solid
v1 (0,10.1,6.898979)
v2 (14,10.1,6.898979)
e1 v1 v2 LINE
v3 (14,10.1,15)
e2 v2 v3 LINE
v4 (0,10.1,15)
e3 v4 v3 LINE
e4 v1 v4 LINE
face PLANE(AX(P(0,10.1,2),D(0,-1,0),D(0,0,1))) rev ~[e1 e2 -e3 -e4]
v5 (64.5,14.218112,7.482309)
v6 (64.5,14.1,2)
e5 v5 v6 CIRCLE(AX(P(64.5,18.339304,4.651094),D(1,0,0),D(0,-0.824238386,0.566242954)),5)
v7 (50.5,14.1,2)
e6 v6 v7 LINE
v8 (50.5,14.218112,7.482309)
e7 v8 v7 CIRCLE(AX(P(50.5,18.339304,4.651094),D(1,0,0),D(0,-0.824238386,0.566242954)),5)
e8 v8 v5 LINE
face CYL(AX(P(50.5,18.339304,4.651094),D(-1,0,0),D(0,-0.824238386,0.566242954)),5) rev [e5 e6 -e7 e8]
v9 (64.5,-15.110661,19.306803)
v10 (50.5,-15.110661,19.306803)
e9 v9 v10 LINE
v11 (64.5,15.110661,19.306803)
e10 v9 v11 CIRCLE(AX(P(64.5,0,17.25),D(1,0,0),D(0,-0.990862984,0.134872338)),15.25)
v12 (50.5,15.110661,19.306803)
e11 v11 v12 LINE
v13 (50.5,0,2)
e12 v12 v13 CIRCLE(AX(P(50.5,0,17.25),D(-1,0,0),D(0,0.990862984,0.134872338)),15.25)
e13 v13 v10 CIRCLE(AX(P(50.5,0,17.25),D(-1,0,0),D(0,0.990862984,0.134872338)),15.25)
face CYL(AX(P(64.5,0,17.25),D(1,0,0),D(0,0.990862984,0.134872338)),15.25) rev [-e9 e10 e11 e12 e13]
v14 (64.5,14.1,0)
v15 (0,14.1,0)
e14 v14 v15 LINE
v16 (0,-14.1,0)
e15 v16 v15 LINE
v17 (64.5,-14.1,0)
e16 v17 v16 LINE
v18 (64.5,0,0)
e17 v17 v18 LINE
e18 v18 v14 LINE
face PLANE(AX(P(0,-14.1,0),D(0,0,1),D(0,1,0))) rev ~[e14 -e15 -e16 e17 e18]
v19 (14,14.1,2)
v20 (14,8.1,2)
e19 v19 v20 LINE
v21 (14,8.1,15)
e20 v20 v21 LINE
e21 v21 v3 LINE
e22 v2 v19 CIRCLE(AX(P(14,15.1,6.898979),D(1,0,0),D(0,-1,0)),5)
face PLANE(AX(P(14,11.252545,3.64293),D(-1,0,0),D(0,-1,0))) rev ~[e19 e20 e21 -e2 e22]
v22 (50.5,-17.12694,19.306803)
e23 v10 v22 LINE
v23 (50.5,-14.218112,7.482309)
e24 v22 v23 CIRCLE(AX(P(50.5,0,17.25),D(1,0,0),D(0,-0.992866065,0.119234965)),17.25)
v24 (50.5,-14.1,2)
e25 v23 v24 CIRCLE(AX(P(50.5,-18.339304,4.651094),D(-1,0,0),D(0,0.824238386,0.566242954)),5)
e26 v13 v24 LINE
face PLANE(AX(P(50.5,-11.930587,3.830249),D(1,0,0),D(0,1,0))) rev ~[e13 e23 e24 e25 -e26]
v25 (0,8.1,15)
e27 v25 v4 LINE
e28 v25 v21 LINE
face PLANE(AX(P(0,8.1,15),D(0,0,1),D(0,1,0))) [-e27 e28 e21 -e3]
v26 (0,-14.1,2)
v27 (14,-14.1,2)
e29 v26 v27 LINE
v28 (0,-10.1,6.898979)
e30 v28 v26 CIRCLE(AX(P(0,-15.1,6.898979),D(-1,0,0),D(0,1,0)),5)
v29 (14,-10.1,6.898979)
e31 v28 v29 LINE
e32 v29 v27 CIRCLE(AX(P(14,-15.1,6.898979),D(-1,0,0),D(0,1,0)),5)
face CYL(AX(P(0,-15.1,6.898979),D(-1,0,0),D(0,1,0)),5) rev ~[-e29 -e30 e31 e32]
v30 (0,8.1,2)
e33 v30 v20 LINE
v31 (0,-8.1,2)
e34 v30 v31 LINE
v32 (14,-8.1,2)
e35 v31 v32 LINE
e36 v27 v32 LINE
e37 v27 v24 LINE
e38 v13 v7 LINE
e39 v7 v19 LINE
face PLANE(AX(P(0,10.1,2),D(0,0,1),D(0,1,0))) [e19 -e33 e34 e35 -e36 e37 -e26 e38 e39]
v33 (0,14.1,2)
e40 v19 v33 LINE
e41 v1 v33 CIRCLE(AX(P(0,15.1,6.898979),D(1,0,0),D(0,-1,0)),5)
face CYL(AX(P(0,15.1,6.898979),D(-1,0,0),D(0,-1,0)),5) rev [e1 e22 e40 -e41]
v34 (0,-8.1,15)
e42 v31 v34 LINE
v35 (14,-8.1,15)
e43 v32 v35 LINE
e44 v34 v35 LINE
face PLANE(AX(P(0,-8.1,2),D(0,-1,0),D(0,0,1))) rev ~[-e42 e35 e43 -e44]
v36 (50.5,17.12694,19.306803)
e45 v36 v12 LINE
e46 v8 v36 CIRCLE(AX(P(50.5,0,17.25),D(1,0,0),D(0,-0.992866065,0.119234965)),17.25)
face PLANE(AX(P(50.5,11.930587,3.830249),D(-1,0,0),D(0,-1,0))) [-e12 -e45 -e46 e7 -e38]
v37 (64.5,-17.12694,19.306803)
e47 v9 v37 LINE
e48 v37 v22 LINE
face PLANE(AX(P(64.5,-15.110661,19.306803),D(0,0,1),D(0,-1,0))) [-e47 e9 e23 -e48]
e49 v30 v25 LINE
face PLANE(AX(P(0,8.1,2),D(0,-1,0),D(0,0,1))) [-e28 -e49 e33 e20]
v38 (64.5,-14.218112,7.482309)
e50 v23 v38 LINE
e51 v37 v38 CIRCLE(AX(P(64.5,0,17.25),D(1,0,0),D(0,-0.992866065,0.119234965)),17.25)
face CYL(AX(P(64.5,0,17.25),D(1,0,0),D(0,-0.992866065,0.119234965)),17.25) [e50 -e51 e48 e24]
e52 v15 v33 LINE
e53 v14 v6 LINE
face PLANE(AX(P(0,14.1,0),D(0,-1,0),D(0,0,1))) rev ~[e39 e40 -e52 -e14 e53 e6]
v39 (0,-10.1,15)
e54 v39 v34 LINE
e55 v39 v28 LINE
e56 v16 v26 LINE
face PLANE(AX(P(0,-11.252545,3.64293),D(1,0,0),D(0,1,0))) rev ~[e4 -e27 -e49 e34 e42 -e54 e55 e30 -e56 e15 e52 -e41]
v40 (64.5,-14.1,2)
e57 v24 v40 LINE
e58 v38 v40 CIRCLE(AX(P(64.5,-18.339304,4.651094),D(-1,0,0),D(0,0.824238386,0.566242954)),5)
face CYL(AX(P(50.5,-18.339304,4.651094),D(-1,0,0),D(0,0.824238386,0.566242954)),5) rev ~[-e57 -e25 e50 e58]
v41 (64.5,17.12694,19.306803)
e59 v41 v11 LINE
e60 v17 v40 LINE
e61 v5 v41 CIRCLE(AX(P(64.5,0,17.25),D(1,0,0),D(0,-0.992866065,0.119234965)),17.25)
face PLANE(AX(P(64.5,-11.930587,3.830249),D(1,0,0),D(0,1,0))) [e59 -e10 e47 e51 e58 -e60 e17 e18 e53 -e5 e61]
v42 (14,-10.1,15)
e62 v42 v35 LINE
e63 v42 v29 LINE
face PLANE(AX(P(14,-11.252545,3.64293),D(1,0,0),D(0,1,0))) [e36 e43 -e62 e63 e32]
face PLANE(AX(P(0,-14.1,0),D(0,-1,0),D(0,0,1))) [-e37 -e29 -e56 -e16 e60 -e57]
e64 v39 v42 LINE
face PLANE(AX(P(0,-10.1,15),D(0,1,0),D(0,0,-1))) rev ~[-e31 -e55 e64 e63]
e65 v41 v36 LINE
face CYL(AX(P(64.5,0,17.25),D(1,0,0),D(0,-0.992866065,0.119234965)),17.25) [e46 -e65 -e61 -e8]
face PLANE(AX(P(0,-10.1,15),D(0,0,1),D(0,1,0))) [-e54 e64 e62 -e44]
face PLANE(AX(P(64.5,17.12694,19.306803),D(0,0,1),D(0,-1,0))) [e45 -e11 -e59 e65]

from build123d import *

# Parameters (mm, degrees)
F0_W        = 2
F0_H        = 13
F0_W_2      = 4
F0_H_2      = 2
F1_DEPTH    = 14
F2_DEPTH    = 64.5
F4_DEPTH    = 14
F5_T1_DEPTH = 14
F5_T3_DEPTH = 14


# Not quite as in the source:
# - a fillet or chamfer that OpenCascade refuses, or shapes differently, is made with other operations: its cross-section is extruded or revolved along the edge and cut away or added


with BuildPart() as f1:
    # F0 (on Right) → F1 (new body)
    with BuildSketch(Plane.YZ):
        Polygon((-10.1, 0), (0, 0), (10.1, 0), (10.1, 2), (8.1, 2), (0, 2), (-8.1, 2), (-10.1, 2), align=None)
        with Locations((-9.1, 8.5)):
            Rectangle(F0_W, F0_H)
        with Locations((9.1, 8.5)):
            Rectangle(F0_W, F0_H)
        with Locations((-12.1, 1)):
            Rectangle(F0_W_2, F0_H_2)
        with Locations((12.1, 1)):
            Rectangle(F0_W_2, F0_H_2)
    extrude(amount=F1_DEPTH)

    # F0 (on Right) → F2 (join)
    with BuildSketch(Plane.YZ):
        with Locations((-12.1, 1)):
            Rectangle(F0_W_2, F0_H_2)
        Polygon((-10.1, 0), (0, 0), (10.1, 0), (10.1, 2), (8.1, 2), (0, 2), (-8.1, 2), (-10.1, 2), align=None)
        with Locations((12.1, 1)):
            Rectangle(F0_W_2, F0_H_2)
    extrude(amount=F2_DEPTH)

    # F3 (on face) → F4 (join)
    with BuildSketch(Plane.YZ.offset(64.5)):
        with BuildLine():
            ThreePointArc((15.1106605022, 19.3068031473), (0, 2), (-15.1106605022, 19.3068031473))
            Line((-15.1106605022, 19.3068031473), (-17.1269396219, 19.3068031473))
            ThreePointArc((-17.1269396219, 19.3068031473), (0, 0), (17.1269396219, 19.3068031473))
            Line((17.1269396219, 19.3068031473), (15.1106605022, 19.3068031473))
        make_face()
    extrude(amount=-F4_DEPTH)

    # F5: fillet of radius 5 on 4 edges, made by hand

    # F5_s2 → F5_t1 (join)
    with BuildSketch(Plane.YZ):
        with BuildLine():
            ThreePointArc((-10.1, 6.8989794856), (-11.2270166538, 3.7367018254), (-14.1, 2))
            Line((-14.1, 2), (-10.1, 2))
            Line((-10.1, 2), (-10.1, 6.8989794856))
        make_face()
        with BuildLine():
            ThreePointArc((10.1, 6.8989794856), (11.2270166538, 3.7367018254), (14.1, 2))
            Line((14.1, 2), (10.1, 2))
            Line((10.1, 2), (10.1, 6.8989794856))
        make_face()
    extrude(amount=F5_T1_DEPTH)

    # F5_s4 → F5_t3 (join)
    with BuildSketch(Plane.YZ.offset(50.5)):
        with BuildLine():
            ThreePointArc((-14.2181121589, 7.4823090427), (-13.3404640704, 4.7587904606), (-14.1, 2))
            Line((-14.1, 2), (-8.0622577483, 2))
            ThreePointArc((-8.0622577483, 2), (-11.4724735306, 4.3680416438), (-14.2181121589, 7.4823090427))
        make_face()
        with BuildLine():
            ThreePointArc((14.2181121589, 7.4823090427), (13.3404640704, 4.7587904606), (14.1, 2))
            Line((14.1, 2), (8.0622577483, 2))
            ThreePointArc((8.0622577483, 2), (11.4724735306, 4.3680416438), (14.2181121589, 7.4823090427))
        make_face()
    extrude(amount=F5_T3_DEPTH)


solid = f1.part
